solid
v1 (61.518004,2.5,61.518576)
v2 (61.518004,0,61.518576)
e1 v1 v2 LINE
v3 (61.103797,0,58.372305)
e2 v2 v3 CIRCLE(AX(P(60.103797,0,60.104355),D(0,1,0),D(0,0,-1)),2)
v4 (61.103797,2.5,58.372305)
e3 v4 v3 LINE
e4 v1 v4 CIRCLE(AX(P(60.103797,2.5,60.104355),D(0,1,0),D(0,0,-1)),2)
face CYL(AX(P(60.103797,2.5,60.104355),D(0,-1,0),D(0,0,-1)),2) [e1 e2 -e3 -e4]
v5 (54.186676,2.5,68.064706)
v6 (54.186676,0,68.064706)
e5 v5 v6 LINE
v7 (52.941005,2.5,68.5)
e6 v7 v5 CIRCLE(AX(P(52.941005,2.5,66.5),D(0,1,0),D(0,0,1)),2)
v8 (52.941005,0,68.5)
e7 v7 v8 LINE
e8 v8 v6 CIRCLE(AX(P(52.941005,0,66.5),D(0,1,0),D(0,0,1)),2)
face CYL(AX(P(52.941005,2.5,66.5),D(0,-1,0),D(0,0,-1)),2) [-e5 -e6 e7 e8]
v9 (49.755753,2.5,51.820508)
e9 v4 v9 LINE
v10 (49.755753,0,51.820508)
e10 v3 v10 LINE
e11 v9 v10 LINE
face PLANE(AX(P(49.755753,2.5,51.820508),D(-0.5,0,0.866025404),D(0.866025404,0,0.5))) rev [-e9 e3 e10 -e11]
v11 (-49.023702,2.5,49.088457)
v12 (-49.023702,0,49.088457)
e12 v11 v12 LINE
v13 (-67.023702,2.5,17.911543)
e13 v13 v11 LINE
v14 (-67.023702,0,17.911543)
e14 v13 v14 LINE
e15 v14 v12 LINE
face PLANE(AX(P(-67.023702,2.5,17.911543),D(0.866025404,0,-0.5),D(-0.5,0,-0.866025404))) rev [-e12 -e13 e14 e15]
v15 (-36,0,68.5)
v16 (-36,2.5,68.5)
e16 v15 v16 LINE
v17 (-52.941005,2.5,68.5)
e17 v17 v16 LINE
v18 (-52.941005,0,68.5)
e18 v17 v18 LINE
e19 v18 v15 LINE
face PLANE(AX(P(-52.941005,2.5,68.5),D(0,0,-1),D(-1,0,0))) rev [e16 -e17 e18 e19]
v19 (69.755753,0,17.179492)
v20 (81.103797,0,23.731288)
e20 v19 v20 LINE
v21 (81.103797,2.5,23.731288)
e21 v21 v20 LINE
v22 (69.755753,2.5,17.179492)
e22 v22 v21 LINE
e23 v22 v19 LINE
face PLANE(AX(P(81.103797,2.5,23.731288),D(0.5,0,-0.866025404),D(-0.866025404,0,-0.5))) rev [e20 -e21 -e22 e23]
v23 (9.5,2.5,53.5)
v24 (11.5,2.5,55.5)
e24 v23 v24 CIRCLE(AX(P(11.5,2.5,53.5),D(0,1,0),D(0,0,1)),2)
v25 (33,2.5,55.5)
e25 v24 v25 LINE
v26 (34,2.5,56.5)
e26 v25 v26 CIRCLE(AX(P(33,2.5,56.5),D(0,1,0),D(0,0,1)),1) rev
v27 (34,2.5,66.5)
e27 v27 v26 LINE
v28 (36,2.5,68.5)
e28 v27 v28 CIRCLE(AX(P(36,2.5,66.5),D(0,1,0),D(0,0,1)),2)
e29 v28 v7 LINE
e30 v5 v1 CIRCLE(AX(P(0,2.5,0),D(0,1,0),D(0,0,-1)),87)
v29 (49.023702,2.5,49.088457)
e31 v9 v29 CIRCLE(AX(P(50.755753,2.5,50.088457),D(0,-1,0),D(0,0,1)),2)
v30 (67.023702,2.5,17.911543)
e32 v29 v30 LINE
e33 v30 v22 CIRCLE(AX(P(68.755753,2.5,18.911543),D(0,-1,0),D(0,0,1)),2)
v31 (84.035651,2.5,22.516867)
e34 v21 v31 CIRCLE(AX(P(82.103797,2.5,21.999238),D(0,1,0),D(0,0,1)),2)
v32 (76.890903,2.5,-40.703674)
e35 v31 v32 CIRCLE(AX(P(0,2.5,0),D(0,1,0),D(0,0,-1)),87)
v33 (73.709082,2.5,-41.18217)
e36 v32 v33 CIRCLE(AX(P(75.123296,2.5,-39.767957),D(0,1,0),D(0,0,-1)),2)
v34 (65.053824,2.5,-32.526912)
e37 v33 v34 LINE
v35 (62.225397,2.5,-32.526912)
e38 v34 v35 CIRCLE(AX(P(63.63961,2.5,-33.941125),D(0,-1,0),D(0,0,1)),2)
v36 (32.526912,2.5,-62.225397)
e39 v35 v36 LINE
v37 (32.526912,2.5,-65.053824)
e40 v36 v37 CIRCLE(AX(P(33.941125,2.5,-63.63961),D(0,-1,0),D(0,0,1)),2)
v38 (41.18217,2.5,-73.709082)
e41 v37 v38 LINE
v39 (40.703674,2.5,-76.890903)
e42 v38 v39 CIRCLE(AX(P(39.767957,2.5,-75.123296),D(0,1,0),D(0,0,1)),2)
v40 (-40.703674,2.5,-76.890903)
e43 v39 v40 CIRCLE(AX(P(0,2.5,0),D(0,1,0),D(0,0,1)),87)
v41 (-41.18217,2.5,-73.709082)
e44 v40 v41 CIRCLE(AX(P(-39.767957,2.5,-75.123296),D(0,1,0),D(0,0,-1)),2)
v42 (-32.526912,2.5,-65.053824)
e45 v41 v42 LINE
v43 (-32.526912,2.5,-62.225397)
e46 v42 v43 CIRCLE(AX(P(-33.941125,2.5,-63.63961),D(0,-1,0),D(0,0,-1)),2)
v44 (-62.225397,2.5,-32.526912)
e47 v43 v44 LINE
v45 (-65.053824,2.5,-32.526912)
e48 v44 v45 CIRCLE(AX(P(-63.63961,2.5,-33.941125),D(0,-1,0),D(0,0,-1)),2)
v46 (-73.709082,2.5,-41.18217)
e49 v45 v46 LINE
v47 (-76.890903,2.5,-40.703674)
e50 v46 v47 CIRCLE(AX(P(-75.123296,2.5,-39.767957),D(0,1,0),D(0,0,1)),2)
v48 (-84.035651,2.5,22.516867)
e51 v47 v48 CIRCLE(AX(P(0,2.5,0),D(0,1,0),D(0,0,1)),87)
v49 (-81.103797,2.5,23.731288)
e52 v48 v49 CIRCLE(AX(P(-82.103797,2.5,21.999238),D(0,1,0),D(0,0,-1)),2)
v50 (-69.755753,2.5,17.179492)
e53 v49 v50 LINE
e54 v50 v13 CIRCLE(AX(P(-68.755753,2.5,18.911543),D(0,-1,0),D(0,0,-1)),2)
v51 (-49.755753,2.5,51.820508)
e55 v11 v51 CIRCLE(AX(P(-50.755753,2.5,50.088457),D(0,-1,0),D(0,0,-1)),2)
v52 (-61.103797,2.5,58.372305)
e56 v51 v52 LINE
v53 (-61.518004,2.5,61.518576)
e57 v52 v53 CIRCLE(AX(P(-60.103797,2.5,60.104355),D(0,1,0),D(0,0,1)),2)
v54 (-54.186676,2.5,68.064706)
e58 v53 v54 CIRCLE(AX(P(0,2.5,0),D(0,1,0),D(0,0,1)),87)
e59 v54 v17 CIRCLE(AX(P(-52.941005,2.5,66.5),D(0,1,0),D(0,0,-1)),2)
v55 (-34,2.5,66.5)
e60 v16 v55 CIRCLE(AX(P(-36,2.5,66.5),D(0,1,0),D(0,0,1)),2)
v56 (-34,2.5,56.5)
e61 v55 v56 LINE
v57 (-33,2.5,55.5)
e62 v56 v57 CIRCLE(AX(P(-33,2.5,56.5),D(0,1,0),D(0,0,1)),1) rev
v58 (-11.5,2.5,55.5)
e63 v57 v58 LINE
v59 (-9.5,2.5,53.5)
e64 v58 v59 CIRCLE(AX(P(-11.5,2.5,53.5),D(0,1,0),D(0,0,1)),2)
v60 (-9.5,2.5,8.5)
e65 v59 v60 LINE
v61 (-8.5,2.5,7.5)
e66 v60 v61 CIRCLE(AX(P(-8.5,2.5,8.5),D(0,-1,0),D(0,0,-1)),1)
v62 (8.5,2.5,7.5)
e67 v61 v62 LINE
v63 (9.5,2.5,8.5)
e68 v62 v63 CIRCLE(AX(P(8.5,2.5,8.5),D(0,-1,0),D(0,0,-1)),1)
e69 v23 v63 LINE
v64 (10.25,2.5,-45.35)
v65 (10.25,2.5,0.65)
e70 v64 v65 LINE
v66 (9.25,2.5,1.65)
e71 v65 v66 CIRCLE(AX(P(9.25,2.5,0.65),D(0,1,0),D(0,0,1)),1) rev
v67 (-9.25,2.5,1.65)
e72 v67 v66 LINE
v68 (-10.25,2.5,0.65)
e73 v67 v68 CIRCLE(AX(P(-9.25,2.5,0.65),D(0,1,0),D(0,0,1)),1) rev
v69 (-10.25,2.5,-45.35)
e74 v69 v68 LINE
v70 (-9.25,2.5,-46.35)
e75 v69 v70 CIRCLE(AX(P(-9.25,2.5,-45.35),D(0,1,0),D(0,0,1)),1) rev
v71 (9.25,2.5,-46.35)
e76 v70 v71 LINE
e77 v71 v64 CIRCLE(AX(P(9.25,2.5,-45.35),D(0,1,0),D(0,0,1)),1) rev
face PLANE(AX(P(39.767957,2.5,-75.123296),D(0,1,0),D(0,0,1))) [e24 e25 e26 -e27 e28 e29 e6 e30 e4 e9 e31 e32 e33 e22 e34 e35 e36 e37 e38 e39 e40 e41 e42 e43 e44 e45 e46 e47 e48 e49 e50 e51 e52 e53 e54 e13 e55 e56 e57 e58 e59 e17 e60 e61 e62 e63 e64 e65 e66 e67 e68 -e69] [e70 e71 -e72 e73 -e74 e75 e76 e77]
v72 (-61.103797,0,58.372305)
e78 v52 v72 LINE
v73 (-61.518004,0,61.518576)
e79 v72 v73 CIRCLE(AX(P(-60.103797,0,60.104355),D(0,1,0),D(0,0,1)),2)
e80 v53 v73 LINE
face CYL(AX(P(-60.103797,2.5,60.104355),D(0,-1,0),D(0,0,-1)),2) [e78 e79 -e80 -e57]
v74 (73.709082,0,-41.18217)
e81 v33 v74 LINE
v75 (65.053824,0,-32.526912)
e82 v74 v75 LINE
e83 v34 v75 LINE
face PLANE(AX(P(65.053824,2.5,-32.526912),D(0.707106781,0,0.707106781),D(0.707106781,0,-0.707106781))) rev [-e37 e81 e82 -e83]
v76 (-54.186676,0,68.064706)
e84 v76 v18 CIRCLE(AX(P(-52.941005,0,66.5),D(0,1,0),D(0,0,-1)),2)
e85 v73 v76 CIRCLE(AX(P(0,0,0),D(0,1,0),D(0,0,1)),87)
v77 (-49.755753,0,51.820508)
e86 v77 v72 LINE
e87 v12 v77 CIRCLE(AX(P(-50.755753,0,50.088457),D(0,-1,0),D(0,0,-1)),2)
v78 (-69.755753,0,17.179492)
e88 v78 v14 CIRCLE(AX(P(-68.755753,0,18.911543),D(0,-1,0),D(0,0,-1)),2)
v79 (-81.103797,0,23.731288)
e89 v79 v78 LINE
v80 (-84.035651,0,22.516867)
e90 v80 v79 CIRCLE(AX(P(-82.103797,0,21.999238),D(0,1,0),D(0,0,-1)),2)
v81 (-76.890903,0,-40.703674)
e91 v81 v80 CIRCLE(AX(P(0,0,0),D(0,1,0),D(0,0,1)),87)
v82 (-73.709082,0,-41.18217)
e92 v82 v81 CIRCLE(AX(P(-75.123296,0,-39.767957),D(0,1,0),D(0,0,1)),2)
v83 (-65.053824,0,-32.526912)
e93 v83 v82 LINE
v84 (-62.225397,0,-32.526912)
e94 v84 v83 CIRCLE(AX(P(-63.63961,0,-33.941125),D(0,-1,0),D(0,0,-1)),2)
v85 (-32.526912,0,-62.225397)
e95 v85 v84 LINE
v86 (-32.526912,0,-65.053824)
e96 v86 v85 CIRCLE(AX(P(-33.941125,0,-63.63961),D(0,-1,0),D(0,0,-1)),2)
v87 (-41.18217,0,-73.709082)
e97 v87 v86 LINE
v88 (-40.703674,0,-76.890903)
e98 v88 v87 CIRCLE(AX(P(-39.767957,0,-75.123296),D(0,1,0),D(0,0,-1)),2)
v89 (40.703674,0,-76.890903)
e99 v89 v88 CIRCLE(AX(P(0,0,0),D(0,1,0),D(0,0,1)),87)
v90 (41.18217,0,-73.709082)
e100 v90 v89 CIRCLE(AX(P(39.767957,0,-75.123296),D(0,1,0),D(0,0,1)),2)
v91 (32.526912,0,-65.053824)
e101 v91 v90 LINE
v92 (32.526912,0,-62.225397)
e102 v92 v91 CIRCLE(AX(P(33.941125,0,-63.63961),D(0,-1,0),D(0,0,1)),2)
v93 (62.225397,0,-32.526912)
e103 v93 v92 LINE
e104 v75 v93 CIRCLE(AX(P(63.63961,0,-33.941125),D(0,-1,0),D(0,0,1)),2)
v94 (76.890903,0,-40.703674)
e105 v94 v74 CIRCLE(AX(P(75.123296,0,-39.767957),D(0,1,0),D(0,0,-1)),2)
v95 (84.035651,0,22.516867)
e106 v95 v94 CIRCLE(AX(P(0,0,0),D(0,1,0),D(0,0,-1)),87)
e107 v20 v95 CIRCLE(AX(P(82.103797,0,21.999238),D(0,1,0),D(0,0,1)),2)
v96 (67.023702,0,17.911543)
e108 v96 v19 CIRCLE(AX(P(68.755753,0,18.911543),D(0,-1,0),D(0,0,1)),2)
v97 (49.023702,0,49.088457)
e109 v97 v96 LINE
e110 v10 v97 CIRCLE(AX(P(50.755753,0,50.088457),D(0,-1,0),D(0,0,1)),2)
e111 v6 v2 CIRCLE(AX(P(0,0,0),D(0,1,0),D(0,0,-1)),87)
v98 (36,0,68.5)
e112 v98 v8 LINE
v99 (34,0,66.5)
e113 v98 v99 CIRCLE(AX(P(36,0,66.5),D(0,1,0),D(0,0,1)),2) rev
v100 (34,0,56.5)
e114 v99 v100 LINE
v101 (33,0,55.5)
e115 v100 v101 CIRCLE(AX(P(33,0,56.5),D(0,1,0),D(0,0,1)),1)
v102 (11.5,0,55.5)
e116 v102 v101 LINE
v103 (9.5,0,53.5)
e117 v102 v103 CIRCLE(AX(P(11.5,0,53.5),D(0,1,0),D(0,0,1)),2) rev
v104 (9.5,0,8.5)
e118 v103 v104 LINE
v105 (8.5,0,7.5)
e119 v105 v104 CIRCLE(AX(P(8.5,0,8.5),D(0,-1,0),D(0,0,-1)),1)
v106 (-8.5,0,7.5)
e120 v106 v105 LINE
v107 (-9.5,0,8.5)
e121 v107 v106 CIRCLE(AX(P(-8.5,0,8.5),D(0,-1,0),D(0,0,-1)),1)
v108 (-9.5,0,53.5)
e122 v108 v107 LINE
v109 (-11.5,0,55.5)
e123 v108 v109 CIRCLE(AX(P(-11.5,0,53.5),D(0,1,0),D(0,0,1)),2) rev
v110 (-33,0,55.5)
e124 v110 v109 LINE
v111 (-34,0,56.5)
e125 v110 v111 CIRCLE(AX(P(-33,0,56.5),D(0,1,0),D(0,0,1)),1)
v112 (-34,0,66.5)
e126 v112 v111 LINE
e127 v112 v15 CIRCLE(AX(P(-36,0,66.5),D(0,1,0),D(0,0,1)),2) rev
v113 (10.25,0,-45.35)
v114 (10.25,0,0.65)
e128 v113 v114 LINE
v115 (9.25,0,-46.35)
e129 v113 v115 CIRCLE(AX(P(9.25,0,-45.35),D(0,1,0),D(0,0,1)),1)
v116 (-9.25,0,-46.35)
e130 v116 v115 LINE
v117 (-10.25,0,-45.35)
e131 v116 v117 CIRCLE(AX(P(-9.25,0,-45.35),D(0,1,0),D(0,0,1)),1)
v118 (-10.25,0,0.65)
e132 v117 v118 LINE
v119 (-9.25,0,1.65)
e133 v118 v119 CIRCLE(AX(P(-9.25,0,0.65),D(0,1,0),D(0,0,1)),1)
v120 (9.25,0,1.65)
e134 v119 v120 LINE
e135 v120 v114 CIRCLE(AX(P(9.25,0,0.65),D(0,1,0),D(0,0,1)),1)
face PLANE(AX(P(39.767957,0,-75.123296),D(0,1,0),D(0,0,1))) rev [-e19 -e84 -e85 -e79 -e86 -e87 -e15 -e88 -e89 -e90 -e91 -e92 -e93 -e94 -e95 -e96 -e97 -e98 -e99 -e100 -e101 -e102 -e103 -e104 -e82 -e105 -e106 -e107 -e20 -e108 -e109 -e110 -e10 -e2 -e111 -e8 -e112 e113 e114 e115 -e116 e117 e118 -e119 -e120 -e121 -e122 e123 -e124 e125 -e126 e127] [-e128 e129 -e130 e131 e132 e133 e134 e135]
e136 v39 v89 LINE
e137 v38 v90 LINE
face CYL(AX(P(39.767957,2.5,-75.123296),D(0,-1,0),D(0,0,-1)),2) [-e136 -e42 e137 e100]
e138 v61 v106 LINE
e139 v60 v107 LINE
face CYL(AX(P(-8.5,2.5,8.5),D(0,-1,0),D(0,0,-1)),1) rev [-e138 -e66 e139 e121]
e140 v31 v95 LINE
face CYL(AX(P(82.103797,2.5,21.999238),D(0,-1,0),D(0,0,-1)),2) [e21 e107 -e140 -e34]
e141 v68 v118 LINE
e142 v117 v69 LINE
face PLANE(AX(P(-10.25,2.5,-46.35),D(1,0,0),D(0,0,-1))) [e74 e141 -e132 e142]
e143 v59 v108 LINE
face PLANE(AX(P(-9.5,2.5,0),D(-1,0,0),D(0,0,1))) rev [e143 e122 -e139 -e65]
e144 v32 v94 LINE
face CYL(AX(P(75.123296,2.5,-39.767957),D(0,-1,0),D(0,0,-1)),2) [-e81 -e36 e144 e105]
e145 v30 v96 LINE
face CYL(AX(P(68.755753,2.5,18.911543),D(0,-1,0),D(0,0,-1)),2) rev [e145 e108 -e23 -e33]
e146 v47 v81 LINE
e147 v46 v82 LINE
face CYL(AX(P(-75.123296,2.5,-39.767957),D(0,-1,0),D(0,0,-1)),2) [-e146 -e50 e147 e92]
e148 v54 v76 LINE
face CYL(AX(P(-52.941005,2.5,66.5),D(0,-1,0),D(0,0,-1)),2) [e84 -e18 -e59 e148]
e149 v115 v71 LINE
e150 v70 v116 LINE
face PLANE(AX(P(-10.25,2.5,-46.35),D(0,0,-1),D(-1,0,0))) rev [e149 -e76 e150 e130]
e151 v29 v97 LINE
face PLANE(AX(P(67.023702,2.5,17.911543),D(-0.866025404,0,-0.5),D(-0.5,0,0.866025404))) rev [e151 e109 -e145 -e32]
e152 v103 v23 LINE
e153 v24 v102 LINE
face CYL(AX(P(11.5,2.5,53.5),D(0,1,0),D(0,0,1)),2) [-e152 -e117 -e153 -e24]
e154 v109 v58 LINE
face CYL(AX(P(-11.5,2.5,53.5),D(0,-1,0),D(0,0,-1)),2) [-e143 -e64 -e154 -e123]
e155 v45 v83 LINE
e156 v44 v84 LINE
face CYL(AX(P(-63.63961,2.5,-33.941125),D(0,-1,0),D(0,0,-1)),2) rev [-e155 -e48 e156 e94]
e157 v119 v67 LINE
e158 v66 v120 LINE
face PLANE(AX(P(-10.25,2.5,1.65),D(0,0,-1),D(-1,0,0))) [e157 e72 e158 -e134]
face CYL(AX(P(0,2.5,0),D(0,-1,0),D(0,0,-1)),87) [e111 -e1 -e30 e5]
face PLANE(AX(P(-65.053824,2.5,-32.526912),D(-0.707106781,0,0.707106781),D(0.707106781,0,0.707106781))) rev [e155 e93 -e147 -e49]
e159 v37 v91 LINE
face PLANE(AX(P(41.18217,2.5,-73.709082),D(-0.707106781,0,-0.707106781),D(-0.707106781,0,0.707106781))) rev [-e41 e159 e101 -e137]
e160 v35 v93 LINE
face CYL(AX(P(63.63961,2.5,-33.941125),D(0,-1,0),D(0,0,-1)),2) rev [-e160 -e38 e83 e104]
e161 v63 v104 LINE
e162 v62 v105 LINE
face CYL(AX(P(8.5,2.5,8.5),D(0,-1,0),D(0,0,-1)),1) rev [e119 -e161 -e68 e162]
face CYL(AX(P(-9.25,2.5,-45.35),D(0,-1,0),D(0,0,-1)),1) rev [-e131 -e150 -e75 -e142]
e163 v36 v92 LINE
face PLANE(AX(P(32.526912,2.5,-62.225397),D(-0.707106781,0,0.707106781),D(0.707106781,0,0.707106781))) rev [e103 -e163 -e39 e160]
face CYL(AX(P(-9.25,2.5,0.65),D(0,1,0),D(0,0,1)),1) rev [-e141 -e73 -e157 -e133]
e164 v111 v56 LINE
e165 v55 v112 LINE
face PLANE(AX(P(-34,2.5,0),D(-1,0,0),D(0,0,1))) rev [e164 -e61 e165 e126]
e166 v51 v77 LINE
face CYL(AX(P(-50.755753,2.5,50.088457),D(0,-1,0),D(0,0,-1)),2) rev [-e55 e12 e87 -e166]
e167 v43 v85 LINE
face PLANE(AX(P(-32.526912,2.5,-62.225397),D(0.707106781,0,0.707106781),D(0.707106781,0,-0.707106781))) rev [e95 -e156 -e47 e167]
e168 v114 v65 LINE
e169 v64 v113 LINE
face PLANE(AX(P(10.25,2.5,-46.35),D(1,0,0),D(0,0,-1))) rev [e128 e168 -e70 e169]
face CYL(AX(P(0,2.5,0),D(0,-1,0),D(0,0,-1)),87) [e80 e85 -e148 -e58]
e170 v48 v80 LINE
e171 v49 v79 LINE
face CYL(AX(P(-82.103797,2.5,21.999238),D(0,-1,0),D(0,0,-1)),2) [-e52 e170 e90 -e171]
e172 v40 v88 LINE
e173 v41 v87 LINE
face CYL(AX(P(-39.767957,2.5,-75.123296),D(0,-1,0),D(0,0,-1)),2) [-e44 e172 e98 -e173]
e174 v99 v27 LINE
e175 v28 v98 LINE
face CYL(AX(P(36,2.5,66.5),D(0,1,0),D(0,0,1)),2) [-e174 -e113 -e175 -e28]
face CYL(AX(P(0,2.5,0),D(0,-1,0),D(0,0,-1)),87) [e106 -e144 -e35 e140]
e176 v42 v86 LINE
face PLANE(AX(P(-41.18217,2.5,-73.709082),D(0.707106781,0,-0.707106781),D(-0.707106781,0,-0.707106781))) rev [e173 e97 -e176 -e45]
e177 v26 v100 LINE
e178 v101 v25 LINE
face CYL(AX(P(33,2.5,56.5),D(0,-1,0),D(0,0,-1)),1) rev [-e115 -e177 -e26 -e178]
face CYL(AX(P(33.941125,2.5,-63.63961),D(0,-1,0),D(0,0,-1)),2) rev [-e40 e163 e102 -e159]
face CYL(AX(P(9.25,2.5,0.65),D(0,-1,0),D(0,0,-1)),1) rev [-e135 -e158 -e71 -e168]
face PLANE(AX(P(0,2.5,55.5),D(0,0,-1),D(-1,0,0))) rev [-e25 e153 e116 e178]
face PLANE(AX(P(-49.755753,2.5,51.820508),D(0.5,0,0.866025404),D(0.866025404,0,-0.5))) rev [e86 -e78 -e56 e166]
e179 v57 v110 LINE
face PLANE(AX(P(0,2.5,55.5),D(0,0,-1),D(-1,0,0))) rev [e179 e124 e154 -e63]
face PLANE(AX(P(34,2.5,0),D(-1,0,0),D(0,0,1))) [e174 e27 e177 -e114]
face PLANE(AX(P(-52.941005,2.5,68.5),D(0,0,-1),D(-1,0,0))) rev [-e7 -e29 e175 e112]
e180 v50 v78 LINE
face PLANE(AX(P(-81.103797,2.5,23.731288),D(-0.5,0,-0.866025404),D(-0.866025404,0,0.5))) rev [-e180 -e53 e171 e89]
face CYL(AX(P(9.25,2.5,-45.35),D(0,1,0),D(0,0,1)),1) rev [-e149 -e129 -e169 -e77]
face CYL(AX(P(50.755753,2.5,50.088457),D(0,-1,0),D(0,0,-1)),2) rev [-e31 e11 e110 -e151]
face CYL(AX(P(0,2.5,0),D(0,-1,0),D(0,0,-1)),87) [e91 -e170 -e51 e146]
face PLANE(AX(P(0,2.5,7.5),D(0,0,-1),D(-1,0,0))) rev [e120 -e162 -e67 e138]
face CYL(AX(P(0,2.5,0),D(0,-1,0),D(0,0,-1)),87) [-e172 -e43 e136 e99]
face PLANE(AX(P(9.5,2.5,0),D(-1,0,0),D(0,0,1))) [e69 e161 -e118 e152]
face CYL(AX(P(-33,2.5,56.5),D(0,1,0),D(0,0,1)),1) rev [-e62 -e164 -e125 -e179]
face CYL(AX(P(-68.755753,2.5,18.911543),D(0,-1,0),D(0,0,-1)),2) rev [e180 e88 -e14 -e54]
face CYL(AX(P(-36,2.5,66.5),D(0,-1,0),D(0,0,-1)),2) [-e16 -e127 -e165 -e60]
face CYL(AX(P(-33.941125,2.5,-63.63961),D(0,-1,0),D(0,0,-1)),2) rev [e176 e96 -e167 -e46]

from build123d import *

# Parameters (mm, degrees)
RESSALTO_EXTRUS_O1_DEPTH = 2.5
ESBO_O13_W               = 20.5
ESBO_O13_H               = 48
CORTE_EXTRUS_O8_DEPTH    = 124.061976256
FILETE1_R                = 2
FILETE2_R                = 1


# Read off the part's stored shape, not the designer's step: Ressalto-extrusão1
with BuildPart() as part:
    # Ressalto-extrusão1 outline → Ressalto-extrusão1 (new body)
    with BuildSketch(Plane(origin=(0, 0, 0), x_dir=(1, 0, 0), z_dir=(0, 1, 0))):
        with BuildLine():
            ThreePointArc((41.182170498, 73.709082433), (41.745717904, 75.420720863), (40.703673569, 76.89090296))
            ThreePointArc((40.703673569, 76.89090296), (0, 87), (-40.703673569, 76.89090296))
            ThreePointArc((-40.703673569, 76.89090296), (-41.745717904, 75.420720863), (-41.182170498, 73.709082433))
            Line((-41.182170498, 73.709082433), (-32.526911935, 65.053823869))
            ThreePointArc((-32.526911935, 65.053823869), (-31.941125497, 63.639610306), (-32.526911935, 62.225396744))
            Line((-32.526911935, 62.225396744), (-62.225396744, 32.526911935))
            ThreePointArc((-62.225396744, 32.526911935), (-63.639610306, 31.941125497), (-65.053823869, 32.526911935))
            Line((-65.053823869, 32.526911935), (-73.709082433, 41.182170498))
            ThreePointArc((-73.709082433, 41.182170498), (-75.420720863, 41.745717904), (-76.89090296, 40.703673569))
            ThreePointArc((-76.89090296, 40.703673569), (-86.449685697, 9.769945899), (-84.035651423, -22.516866789))
            ThreePointArc((-84.035651423, -22.516866789), (-82.869168521, -23.846994955), (-81.103797367, -23.731288475))
            Line((-81.103797367, -23.731288475), (-69.755752861, -17.179491924))
            ThreePointArc((-69.755752861, -17.179491924), (-68.238114771, -16.979691079), (-67.023702054, -17.911542732))
            Line((-67.023702054, -17.911542732), (-49.023702054, -49.088457268))
            ThreePointArc((-49.023702054, -49.088457268), (-48.823901209, -50.606095358), (-49.755752861, -51.820508076))
            Line((-49.755752861, -51.820508076), (-61.103797367, -58.372304626))
            ThreePointArc((-61.103797367, -58.372304626), (-62.086687696, -59.843307652), (-61.518004364, -61.518575561))
            ThreePointArc((-61.518004364, -61.518575561), (-57.944854795, -64.895252544), (-54.186675605, -68.064705882))
            ThreePointArc((-54.186675605, -68.064705882), (-53.600773132, -68.388042871), (-52.941004902, -68.5))
            Line((-52.941004902, -68.5), (52.941004902, -68.5))
            ThreePointArc((52.941004902, -68.5), (53.600773132, -68.388042871), (54.186675605, -68.064705882))
            ThreePointArc((54.186675605, -68.064705882), (57.944854795, -64.895252544), (61.518004364, -61.518575561))
            ThreePointArc((61.518004364, -61.518575561), (62.086687696, -59.843307652), (61.103797367, -58.372304626))
            Line((61.103797367, -58.372304626), (49.755752861, -51.820508076))
            ThreePointArc((49.755752861, -51.820508076), (48.823901209, -50.606095358), (49.023702054, -49.088457268))
            Line((49.023702054, -49.088457268), (67.023702054, -17.911542732))
            ThreePointArc((67.023702054, -17.911542732), (68.238114771, -16.979691079), (69.755752861, -17.179491924))
            Line((69.755752861, -17.179491924), (81.103797367, -23.731288475))
            ThreePointArc((81.103797367, -23.731288475), (82.869168521, -23.846994955), (84.035651423, -22.516866789))
            ThreePointArc((84.035651423, -22.516866789), (86.449685697, 9.769945899), (76.89090296, 40.703673569))
            ThreePointArc((76.89090296, 40.703673569), (75.420720863, 41.745717904), (73.709082433, 41.182170498))
            Line((73.709082433, 41.182170498), (65.053823869, 32.526911935))
            ThreePointArc((65.053823869, 32.526911935), (63.639610306, 31.941125497), (62.225396744, 32.526911935))
            Line((62.225396744, 32.526911935), (32.526911935, 62.225396744))
            ThreePointArc((32.526911935, 62.225396744), (31.941125497, 63.639610306), (32.526911935, 65.053823869))
            Line((32.526911935, 65.053823869), (41.182170498, 73.709082433))
        make_face()
    extrude(amount=RESSALTO_EXTRUS_O1_DEPTH)

    # Esboço13 → Corte-extrusão8 (cut, through all)
    with BuildSketch(Plane.XZ):
        with BuildLine():
            ThreePointArc((-9.5, 67.5), (-9.207106781, 68.207106781), (-8.5, 68.5))
            Line((-8.5, 68.5), (-34, 68.5))
            Line((-34, 68.5), (-34, 55.5))
            Line((-34, 55.5), (-9.5, 55.5))
            Line((-9.5, 55.5), (-9.5, 67.5))
        make_face()
        with BuildLine():
            Line((34, 68.5), (8.5, 68.5))
            ThreePointArc((8.5, 68.5), (9.207106781, 68.207106781), (9.5, 67.5))
            Line((9.5, 67.5), (9.5, 55.5))
            Line((9.5, 55.5), (34, 55.5))
            Line((34, 55.5), (34, 68.5))
        make_face()
        with BuildLine():
            Line((8.5, 68.5), (-8.5, 68.5))
            ThreePointArc((-8.5, 68.5), (-9.207106781, 68.207106781), (-9.5, 67.5))
            Line((-9.5, 67.5), (-9.5, 55.5))
            Line((-9.5, 55.5), (9.5, 55.5))
            Line((9.5, 55.5), (9.5, 67.5))
            ThreePointArc((9.5, 67.5), (9.207106781, 68.207106781), (8.5, 68.5))
        make_face()
        with BuildLine():
            Line((9.5, 55.5), (-9.5, 55.5))
            Line((-9.5, 55.5), (-9.5, 8.5))
            ThreePointArc((-9.5, 8.5), (-9.207106781, 7.792893219), (-8.5, 7.5))
            Line((-8.5, 7.5), (8.5, 7.5))
            ThreePointArc((8.5, 7.5), (9.207106781, 7.792893219), (9.5, 8.5))
            Line((9.5, 8.5), (9.5, 55.5))
        make_face()
        with Locations((0, -22.35)):
            Rectangle(ESBO_O13_W, ESBO_O13_H)
    extrude(amount=-CORTE_EXTRUS_O8_DEPTH, mode=Mode.SUBTRACT)

    # Filete1
    filete1_edges = [part.edges().sort_by_distance(p)[0] for p in [
        (-9.5, 1.25, 55.5),
        (-34, 1.25, 68.5),
        (34, 1.25, 68.5),
        (9.5, 1.25, 55.5),
    ]]
    fillet(filete1_edges, radius=FILETE1_R)

    # Filete2
    filete2_edges = [part.edges().sort_by_distance(p)[0] for p in [
        (-34, 1.25, 55.5),
        (34, 1.25, 55.5),
        (-10.25, 1.25, 1.65),
        (10.25, 1.25, 1.65),
        (10.25, 1.25, -46.35),
        (-10.25, 1.25, -46.35),
    ]]
    fillet(filete2_edges, radius=FILETE2_R)


solid = part.part
